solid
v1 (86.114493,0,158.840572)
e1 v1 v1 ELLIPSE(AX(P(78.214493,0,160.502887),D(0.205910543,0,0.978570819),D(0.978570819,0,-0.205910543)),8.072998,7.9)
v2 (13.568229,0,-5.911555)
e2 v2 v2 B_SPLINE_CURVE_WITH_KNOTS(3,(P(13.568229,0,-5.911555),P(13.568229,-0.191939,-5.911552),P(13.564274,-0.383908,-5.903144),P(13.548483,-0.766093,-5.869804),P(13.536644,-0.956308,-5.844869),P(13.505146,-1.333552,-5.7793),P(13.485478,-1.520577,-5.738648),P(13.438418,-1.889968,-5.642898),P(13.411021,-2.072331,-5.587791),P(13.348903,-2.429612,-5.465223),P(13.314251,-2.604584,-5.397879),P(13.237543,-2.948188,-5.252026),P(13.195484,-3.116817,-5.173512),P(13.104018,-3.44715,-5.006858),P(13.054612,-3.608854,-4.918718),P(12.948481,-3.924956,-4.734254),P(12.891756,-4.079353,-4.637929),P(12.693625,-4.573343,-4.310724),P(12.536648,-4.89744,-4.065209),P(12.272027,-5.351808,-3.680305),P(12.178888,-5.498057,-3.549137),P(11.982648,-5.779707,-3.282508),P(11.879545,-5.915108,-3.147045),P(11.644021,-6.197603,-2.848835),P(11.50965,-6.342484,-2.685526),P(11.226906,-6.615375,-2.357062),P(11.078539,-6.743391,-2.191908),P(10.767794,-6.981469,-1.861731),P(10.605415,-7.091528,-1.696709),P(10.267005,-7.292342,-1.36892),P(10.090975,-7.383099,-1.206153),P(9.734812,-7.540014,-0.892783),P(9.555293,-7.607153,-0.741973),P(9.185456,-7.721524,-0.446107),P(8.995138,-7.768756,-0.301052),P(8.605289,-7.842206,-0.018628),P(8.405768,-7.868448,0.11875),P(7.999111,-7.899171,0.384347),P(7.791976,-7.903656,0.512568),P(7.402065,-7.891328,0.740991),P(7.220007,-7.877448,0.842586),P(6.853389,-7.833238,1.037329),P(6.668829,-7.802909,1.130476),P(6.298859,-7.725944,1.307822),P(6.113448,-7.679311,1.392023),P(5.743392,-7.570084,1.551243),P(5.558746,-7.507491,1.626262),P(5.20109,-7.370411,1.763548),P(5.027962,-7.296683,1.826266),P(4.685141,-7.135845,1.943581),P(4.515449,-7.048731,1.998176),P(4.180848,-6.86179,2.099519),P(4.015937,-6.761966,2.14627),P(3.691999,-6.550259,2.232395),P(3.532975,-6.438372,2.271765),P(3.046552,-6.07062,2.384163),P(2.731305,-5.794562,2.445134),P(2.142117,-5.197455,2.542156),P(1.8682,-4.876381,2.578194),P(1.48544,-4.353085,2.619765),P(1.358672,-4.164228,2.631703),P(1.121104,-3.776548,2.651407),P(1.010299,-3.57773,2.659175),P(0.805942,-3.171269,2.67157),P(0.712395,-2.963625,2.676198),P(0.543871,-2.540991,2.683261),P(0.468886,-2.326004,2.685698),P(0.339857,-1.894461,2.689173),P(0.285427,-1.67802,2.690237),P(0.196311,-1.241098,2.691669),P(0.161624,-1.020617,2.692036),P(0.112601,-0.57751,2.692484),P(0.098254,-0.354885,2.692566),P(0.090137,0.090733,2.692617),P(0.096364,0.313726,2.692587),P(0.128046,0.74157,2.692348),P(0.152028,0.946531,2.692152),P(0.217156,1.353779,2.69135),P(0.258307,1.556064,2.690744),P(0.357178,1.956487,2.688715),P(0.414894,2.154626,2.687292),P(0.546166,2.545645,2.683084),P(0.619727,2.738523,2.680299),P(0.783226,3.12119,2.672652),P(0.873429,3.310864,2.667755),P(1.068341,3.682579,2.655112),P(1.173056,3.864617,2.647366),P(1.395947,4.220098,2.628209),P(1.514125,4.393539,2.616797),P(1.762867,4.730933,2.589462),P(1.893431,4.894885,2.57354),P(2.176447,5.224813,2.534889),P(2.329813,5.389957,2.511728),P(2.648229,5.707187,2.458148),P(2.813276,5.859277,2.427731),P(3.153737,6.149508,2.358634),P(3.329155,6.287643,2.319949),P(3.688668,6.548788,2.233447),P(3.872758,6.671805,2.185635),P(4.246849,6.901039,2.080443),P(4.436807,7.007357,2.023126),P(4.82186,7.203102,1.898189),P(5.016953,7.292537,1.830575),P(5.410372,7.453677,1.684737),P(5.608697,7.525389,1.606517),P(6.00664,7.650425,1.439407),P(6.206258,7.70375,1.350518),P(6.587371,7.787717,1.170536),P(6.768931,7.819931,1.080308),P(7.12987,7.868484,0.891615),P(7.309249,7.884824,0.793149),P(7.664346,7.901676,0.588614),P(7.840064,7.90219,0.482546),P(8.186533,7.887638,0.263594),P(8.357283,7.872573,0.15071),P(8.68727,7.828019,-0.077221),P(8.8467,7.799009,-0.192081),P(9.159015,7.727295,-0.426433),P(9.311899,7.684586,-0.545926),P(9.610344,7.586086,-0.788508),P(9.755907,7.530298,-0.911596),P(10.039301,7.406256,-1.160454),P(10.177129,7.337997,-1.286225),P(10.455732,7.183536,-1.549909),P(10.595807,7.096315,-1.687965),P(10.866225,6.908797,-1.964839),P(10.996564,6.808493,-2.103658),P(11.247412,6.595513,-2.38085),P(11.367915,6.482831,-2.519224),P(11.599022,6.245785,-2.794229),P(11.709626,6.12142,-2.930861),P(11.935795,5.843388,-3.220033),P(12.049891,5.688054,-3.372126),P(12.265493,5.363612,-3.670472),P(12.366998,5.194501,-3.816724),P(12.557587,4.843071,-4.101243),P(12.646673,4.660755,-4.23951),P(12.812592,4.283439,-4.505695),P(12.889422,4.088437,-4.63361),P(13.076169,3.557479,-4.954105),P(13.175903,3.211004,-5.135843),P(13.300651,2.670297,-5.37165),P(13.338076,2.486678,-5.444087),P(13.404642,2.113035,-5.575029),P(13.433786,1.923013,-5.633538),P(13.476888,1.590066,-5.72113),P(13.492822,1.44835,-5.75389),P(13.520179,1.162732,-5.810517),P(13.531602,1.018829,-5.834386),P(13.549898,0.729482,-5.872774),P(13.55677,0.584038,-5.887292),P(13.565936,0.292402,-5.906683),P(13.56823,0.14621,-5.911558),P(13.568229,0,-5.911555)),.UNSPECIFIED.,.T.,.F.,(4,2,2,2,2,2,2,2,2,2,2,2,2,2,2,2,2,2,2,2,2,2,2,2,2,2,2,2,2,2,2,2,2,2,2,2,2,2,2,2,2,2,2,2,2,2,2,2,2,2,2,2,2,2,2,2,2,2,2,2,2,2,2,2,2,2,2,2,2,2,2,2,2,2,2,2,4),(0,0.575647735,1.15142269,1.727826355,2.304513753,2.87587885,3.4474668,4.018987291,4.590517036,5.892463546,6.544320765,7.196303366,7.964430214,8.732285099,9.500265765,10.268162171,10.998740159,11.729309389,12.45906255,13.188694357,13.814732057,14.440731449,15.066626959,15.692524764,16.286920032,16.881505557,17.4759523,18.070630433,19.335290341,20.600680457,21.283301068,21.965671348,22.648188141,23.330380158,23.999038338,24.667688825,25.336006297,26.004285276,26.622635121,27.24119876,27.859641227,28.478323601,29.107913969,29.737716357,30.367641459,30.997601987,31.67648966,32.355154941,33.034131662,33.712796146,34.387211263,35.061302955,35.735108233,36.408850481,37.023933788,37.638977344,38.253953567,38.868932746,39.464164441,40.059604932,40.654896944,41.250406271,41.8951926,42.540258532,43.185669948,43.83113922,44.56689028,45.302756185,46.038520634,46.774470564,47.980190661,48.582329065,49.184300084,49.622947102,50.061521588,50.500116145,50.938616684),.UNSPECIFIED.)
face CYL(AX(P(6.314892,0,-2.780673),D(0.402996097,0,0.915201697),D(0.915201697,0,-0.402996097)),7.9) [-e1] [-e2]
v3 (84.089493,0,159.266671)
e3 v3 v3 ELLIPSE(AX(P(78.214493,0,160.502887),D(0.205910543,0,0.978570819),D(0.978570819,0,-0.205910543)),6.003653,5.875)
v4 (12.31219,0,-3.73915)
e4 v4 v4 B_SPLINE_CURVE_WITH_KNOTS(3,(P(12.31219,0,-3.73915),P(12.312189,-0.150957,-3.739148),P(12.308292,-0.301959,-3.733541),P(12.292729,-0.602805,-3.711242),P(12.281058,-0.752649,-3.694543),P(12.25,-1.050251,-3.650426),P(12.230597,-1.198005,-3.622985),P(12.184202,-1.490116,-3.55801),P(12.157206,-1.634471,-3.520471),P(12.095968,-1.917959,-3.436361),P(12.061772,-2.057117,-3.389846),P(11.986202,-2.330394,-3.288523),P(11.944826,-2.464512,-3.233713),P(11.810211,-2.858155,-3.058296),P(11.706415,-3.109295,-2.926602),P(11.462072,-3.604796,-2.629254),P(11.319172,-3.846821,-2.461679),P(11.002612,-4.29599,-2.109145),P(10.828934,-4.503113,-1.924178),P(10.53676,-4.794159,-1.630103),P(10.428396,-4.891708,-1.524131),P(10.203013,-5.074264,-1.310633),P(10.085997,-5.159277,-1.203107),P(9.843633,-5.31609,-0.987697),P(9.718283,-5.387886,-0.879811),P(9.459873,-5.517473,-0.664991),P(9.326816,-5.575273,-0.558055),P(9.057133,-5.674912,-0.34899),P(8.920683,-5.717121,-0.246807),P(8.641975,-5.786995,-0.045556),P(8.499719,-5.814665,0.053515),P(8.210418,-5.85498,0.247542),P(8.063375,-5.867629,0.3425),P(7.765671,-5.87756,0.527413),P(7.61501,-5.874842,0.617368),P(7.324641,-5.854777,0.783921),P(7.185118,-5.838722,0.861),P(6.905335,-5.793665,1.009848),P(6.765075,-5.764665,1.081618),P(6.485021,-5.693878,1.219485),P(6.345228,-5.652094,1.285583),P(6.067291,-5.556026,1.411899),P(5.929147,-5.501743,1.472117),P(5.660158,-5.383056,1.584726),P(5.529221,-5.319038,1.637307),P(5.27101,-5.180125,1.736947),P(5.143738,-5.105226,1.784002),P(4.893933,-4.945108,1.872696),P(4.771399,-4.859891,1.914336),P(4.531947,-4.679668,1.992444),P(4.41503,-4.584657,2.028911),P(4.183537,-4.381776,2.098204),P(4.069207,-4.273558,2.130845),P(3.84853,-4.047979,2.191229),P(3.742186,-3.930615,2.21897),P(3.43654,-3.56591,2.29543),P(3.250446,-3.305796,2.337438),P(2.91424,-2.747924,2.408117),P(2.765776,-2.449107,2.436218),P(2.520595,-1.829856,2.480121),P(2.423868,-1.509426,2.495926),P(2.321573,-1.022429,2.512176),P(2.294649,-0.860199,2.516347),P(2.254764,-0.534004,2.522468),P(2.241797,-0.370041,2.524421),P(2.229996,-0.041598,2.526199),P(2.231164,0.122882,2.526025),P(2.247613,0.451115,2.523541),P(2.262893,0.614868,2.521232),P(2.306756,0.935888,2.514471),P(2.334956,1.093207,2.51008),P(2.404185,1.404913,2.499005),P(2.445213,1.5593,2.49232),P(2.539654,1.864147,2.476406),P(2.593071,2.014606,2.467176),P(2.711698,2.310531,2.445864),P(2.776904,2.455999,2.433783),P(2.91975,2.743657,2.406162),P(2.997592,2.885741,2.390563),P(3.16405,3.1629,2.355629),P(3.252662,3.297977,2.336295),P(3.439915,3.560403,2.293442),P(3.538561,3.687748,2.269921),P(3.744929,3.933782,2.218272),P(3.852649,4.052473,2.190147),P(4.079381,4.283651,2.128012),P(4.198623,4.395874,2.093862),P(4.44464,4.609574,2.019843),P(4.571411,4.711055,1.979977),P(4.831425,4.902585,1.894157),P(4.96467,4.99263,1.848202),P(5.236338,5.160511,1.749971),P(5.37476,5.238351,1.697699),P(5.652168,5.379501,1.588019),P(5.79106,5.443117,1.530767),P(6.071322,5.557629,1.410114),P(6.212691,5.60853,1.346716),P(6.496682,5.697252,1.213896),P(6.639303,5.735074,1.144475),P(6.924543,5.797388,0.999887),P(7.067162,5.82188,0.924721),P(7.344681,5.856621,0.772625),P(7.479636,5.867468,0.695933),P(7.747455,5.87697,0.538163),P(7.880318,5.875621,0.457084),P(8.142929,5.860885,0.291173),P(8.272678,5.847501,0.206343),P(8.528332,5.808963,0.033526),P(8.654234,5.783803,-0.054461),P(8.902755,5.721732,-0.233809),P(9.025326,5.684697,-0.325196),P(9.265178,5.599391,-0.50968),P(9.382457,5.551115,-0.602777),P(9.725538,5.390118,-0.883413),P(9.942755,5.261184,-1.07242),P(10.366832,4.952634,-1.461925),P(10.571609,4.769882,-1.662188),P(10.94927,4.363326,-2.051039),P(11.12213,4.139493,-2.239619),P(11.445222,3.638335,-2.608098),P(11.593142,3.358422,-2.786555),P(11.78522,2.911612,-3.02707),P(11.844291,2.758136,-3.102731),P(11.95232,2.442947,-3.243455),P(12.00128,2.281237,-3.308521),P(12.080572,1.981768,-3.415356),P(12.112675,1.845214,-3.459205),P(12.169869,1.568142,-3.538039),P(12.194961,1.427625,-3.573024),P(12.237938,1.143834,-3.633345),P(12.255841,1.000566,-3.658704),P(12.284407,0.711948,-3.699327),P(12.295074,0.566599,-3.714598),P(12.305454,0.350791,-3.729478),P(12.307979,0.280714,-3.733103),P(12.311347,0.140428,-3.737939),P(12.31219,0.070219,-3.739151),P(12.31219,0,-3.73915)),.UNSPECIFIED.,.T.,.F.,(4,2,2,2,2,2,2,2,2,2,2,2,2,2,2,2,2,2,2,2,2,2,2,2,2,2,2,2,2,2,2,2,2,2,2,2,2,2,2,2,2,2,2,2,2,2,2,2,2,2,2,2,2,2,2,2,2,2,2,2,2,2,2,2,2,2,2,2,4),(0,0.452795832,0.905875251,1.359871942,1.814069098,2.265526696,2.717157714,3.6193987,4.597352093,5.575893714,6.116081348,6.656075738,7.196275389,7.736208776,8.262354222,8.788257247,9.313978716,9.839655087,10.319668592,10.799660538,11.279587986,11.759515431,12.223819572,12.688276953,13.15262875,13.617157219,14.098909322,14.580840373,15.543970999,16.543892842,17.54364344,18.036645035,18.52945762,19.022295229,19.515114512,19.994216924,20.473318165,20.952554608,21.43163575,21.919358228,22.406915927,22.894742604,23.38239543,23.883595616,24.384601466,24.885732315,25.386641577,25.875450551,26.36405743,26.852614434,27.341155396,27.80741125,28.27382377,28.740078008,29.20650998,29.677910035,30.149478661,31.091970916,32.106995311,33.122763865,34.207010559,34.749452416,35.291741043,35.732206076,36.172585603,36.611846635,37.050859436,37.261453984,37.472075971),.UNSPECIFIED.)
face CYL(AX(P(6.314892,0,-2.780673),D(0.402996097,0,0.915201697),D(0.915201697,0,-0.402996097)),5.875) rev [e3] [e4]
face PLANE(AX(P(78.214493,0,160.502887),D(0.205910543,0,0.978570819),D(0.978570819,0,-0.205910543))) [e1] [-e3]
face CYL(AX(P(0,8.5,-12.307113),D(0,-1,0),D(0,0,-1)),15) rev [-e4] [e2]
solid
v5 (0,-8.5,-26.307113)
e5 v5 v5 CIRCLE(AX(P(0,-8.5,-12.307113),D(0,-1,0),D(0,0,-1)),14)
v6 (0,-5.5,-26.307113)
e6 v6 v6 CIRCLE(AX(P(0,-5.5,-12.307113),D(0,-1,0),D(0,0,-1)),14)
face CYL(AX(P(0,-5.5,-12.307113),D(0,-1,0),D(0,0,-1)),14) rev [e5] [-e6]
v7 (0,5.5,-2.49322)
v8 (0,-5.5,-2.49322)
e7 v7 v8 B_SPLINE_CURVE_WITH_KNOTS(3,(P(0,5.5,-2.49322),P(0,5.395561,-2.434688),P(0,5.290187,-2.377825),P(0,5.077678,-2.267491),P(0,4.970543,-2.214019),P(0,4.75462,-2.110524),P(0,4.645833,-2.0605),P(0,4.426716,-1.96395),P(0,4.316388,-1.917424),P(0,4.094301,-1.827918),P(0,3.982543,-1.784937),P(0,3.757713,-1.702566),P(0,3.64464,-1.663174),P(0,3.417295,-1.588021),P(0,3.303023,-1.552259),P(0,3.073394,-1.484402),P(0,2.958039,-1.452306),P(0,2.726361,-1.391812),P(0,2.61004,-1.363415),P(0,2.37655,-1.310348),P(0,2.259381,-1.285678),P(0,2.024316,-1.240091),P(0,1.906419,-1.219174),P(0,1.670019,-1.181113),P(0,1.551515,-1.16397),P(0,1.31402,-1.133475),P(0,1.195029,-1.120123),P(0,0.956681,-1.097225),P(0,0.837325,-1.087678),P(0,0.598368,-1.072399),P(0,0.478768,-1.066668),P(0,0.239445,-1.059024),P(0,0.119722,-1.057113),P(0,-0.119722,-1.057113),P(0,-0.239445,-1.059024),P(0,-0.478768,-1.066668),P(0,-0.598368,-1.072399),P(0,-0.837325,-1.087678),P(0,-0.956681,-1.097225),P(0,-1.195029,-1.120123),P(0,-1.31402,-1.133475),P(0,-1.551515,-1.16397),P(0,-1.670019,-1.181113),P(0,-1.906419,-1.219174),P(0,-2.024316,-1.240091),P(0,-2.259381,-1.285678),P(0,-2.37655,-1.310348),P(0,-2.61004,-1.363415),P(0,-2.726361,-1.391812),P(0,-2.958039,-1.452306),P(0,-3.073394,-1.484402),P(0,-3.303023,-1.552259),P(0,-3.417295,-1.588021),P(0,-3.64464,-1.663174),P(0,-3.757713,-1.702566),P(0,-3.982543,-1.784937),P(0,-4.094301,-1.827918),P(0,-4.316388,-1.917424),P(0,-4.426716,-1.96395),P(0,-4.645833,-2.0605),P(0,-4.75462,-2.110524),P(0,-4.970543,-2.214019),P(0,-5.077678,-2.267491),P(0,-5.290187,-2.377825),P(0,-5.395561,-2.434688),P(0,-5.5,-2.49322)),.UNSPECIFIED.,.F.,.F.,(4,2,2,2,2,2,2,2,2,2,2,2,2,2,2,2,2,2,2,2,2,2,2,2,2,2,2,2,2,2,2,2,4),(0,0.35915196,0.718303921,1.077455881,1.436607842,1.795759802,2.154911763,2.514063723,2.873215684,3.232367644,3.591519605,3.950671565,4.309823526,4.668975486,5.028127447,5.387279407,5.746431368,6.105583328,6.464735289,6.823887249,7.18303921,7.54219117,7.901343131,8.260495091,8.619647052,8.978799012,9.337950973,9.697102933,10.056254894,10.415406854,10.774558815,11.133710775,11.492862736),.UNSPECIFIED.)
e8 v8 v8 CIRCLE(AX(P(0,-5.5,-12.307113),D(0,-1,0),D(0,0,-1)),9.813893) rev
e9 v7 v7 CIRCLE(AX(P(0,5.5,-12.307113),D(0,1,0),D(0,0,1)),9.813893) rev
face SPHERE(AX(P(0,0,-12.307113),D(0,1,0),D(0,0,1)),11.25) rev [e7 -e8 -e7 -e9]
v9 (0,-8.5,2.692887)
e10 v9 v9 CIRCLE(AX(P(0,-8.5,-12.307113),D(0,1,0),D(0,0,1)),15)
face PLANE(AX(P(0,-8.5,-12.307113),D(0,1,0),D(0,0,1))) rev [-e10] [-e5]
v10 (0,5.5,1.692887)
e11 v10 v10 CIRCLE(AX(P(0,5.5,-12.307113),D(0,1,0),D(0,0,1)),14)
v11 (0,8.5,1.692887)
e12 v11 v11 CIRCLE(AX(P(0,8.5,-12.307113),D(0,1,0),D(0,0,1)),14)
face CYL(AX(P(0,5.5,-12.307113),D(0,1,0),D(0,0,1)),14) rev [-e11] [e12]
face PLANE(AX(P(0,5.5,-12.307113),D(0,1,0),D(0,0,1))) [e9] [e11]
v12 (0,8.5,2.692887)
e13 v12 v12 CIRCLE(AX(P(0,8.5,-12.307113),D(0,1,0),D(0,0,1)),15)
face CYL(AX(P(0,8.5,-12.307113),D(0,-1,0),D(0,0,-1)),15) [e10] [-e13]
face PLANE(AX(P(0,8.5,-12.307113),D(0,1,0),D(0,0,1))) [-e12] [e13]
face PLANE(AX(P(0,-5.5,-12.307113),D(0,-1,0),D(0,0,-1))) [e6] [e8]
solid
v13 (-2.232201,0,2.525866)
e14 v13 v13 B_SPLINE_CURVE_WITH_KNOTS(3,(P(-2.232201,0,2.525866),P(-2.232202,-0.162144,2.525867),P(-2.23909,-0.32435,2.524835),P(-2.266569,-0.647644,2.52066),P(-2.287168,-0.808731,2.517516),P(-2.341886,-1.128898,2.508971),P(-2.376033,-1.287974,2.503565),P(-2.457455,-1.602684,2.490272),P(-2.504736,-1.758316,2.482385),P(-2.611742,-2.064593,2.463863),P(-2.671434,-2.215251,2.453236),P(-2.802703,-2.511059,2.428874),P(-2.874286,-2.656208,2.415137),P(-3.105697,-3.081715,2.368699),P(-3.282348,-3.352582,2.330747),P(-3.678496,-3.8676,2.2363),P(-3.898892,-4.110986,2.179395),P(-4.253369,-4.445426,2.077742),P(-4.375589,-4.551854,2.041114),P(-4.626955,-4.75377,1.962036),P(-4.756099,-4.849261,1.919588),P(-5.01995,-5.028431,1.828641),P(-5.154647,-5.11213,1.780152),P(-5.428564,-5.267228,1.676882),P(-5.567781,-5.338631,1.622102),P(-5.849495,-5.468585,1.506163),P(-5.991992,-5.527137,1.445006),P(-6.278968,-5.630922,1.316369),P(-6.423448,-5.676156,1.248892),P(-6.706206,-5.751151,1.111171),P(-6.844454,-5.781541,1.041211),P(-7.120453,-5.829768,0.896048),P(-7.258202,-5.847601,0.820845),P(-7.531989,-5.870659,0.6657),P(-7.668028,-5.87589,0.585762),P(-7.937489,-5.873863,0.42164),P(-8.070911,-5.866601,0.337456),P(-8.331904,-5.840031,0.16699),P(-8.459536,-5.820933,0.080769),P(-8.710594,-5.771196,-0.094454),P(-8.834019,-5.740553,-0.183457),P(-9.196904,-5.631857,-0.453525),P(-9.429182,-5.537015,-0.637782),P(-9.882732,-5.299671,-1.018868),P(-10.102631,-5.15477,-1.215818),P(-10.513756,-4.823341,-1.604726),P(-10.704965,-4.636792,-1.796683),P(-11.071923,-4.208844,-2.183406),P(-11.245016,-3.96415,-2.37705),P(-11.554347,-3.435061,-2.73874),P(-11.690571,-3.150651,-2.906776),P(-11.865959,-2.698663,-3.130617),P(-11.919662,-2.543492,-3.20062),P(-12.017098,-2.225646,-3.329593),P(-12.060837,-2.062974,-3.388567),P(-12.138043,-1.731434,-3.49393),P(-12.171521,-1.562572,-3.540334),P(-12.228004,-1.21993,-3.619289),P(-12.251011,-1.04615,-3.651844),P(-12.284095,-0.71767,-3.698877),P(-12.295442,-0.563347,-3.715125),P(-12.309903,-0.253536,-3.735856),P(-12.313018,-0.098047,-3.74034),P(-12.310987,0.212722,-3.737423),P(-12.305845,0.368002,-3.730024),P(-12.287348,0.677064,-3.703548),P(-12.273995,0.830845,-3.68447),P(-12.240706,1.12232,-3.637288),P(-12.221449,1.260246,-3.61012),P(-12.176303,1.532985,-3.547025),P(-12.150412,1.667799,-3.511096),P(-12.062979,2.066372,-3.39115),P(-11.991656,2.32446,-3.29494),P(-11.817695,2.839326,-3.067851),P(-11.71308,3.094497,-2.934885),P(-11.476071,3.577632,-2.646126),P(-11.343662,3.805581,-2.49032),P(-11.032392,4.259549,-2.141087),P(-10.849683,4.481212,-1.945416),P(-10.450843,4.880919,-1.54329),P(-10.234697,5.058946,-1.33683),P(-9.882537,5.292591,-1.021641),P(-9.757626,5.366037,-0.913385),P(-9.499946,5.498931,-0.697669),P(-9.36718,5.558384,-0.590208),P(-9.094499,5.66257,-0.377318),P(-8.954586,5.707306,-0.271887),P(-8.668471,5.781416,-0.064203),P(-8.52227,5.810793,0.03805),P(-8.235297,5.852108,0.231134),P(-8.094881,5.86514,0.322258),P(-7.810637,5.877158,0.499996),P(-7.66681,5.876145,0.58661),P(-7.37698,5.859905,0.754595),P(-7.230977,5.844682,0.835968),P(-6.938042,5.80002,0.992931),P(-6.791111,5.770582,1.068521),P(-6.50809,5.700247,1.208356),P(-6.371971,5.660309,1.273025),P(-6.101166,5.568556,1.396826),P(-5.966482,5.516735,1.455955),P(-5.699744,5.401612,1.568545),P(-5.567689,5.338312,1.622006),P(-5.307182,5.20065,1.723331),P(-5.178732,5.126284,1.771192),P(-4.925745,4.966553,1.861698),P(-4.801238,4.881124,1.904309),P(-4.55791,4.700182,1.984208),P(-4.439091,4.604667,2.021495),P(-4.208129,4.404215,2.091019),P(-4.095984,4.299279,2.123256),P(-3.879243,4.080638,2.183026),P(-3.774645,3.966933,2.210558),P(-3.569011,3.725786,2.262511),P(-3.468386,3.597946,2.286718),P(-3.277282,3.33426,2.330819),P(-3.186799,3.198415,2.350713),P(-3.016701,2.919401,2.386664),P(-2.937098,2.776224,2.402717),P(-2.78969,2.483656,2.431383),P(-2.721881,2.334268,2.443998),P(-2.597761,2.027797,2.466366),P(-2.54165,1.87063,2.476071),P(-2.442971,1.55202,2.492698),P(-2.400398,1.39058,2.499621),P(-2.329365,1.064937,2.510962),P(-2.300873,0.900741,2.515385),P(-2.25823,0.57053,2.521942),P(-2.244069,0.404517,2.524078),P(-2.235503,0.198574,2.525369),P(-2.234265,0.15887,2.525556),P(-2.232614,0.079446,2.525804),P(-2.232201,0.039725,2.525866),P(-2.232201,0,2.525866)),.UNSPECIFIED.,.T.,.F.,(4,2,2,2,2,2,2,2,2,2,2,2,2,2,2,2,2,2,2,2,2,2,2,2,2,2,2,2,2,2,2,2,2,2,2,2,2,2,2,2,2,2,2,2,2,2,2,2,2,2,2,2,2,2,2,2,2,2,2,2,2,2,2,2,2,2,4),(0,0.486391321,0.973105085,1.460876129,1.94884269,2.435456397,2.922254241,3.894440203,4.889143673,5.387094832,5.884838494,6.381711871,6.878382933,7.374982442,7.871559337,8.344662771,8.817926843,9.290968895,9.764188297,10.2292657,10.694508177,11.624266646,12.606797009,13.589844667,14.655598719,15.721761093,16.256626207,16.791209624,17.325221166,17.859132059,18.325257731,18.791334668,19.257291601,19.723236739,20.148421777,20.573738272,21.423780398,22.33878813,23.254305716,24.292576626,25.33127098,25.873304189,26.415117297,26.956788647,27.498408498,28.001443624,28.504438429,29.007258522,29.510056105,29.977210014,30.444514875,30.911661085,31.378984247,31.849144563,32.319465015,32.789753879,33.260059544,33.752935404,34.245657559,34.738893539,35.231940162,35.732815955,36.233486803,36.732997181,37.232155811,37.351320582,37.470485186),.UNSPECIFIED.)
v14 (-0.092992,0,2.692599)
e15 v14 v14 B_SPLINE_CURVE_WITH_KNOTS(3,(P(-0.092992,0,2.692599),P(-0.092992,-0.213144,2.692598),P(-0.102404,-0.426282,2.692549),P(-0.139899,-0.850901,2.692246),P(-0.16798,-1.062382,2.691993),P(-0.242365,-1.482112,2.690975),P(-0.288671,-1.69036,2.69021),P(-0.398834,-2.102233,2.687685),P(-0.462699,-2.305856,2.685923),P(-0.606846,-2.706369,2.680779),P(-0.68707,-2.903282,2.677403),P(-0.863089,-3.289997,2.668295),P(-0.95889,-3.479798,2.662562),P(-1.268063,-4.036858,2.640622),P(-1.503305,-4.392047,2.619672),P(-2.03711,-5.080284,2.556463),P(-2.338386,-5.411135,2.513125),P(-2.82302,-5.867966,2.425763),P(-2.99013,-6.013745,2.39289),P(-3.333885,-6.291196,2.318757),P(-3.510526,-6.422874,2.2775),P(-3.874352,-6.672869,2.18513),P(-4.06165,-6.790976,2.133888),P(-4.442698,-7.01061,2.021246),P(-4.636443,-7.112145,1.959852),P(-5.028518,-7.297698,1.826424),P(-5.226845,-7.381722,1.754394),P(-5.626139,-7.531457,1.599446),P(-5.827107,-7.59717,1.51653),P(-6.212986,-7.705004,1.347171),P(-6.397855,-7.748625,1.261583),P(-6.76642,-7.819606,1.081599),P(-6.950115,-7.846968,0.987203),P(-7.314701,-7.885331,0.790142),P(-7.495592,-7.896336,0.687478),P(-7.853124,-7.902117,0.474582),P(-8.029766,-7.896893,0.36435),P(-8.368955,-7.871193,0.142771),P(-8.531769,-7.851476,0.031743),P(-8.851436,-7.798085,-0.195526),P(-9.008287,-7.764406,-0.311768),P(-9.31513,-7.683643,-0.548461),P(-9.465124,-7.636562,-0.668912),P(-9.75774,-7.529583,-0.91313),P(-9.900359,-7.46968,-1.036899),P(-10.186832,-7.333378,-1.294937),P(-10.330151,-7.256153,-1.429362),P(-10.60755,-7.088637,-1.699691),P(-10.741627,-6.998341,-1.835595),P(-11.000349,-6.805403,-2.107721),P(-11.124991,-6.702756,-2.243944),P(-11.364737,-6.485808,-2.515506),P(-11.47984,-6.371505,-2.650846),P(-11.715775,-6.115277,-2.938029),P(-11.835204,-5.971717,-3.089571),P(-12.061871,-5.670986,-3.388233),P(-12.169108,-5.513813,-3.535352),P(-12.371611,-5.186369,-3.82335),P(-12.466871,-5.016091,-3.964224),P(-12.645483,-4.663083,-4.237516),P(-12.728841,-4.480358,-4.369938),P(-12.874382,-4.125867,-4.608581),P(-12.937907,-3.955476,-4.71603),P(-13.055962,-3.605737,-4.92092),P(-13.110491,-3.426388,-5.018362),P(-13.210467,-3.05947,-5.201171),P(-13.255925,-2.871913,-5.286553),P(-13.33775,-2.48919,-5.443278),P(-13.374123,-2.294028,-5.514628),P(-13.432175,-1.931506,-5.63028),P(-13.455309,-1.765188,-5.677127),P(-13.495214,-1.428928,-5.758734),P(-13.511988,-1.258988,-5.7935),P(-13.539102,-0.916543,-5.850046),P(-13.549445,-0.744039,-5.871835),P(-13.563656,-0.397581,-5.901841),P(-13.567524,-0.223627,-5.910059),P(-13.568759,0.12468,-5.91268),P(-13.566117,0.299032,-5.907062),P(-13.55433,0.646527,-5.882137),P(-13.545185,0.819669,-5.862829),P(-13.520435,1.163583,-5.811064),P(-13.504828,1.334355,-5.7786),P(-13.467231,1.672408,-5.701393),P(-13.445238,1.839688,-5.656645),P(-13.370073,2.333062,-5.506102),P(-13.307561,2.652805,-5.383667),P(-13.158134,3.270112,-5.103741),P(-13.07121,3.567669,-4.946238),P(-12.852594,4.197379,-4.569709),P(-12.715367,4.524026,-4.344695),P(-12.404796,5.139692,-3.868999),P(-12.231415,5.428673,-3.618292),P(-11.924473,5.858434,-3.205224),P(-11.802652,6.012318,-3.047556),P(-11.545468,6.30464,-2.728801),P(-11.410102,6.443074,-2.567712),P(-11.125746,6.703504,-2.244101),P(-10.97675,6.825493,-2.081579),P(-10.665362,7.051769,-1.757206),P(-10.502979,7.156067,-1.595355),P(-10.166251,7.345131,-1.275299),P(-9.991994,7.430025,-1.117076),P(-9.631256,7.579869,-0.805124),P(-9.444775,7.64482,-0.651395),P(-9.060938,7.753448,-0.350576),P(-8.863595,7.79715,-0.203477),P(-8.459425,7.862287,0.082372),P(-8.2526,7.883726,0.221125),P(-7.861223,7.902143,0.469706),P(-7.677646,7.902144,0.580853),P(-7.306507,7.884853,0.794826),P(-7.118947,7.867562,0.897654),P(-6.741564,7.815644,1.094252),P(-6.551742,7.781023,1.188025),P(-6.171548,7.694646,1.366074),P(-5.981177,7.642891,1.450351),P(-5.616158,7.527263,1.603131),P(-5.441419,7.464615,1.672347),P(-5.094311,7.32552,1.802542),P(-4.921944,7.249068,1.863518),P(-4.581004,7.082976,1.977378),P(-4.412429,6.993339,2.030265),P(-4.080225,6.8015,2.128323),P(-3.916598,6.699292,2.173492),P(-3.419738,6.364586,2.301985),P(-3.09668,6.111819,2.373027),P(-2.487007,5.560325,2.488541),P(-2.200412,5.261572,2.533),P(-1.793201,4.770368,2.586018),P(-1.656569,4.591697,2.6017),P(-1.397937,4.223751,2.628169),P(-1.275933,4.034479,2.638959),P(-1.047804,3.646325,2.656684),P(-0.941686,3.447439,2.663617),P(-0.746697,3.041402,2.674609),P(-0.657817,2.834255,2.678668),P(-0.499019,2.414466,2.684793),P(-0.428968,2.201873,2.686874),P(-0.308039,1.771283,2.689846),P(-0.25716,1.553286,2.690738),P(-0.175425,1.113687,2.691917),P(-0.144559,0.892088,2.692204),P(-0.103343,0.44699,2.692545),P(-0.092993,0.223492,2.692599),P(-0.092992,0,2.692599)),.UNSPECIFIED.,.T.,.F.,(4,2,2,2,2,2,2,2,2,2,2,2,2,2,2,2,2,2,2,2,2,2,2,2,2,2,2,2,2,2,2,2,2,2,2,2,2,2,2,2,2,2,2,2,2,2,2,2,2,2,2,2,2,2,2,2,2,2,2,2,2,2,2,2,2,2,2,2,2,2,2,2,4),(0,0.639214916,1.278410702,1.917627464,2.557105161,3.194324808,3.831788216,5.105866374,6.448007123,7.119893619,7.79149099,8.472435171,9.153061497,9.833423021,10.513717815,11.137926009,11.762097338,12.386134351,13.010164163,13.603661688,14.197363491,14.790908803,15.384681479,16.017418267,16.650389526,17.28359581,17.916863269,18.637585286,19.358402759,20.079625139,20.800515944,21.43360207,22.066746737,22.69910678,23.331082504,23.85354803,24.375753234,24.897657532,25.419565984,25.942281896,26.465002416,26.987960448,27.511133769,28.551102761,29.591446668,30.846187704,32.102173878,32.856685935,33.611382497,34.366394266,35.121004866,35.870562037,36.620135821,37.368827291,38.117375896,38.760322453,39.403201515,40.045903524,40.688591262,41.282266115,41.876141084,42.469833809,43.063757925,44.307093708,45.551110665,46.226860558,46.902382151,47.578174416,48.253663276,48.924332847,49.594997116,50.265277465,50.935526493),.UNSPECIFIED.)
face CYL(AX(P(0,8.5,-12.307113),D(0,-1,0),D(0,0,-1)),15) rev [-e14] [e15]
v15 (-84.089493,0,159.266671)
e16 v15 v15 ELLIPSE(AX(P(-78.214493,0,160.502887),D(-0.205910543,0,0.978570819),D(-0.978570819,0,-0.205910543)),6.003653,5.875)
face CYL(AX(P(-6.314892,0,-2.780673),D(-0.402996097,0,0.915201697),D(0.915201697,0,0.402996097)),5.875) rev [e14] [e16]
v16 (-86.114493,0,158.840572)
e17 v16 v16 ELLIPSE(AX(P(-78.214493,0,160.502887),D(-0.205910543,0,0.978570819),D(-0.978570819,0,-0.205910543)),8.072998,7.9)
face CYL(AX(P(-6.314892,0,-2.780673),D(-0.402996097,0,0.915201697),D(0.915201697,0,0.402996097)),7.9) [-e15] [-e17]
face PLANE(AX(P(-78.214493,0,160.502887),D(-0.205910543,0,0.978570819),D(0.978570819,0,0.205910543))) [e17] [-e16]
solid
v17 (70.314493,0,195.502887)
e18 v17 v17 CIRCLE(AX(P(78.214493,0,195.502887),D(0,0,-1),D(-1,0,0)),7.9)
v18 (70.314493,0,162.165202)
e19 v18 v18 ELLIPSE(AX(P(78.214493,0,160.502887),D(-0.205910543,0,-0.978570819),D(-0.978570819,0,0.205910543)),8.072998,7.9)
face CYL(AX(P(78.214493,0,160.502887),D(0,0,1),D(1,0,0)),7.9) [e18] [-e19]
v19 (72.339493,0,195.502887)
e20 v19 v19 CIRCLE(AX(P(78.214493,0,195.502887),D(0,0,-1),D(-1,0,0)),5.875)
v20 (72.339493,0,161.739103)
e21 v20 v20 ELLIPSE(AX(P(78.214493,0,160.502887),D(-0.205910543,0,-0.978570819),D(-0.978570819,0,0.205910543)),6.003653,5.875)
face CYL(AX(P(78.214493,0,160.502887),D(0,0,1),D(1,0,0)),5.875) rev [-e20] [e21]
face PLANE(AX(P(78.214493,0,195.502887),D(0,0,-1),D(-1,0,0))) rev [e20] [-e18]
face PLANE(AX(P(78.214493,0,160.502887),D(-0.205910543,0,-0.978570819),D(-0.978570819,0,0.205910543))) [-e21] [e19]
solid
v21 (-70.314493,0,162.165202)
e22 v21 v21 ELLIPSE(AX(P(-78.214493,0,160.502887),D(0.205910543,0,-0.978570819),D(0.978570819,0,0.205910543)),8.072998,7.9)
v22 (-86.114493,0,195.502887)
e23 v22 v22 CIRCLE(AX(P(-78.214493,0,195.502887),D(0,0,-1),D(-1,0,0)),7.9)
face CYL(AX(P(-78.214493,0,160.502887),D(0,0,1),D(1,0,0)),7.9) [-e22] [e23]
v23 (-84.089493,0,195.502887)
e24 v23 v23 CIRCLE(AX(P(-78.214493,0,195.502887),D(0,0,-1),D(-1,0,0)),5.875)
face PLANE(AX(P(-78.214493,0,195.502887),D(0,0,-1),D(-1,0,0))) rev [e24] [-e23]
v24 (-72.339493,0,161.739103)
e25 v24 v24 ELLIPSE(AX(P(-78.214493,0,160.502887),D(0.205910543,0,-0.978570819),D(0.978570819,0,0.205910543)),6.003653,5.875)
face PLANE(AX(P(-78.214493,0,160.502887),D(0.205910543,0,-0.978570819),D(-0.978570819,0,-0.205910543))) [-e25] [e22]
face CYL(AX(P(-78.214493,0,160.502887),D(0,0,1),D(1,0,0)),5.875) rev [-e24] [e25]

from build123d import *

# Parameters (mm, degrees)
SKETCH1_ON_SEGMENT_1_R                  = 7.9
SKETCH1_ON_SEGMENT_1_R_2                = 5.875
CIRCULAR_TUBE_21_3_X_2_3_1_DEPTH        = 38.350868903
CIRCULAR_TUBE_21_3_X_2_3_1_2_DEPTH      = 178.412650039
CIRCULAR_TUBE_21_3_X_2_3_1_2_DEPTH_BACK = 3.350868903
SKETCH1_R                               = 7.9
SKETCH1_R_2                             = 5.875
SKETCH11_ON_SEGMENT_1_R                 = 7.9
SKETCH11_ON_SEGMENT_1_R_2               = 5.875
CIRCULAR_TUBE_21_3_X_2_3_2_DEPTH        = 38.350868903
CIRCULAR_TUBE_21_3_X_2_3_2_2_DEPTH      = 178.412650039
CIRCULAR_TUBE_21_3_X_2_3_2_2_DEPTH_BACK = 3.350868903
SKETCH11_R                              = 7.9
SKETCH11_R_2                            = 5.875
SKETCH_1_R                              = 15
EXTRUDE_1_DEPTH                         = 8.5
SKETCH_5_R                              = 14
CUT_EXTRUDE_1_DEPTH                     = 3
SKETCH_7_R                              = 14
CUT_EXTRUDE_2_DEPTH                     = 3
WELD_START                              = -9
WELD_TRIM_4_DEPTH                       = 18
WELD_TRIM_4_2_DEPTH                     = 18


with BuildPart() as part:
    # Sketch1 on segment 1 (carried to segment 1) → Circular tube 21.3 X 2.3(1) (new body)
    with BuildSketch(Plane(origin=(-78.21449332, 0, 195.502886979), x_dir=(-1, 0, 0), z_dir=(0, 0, -1))):
        Circle(SKETCH1_ON_SEGMENT_1_R)
        Circle(SKETCH1_ON_SEGMENT_1_R_2, mode=Mode.SUBTRACT)
    extrude(amount=CIRCULAR_TUBE_21_3_X_2_3_1_DEPTH)

    # Circular tube 21.3 X 2.3(1) mitre 1
    split(bisect_by=Plane(origin=(-78.21449332, 0, 160.502886979), x_dir=(0, -1, 0), z_dir=(-0.205910543, 0, 0.978570819)), keep=Keep.TOP)


with BuildPart() as body_2:
    # Sketch1 → Circular tube 21.3 X 2.3_1 2 (new, two sides: drawn at the far end of the back side and taken through both)
    with BuildSketch(Plane(origin=(-78.21449332, 0, 160.502886979), x_dir=(-0.9152016968098962, 0, -0.4029960969491974), z_dir=(0.4029960969491974, 0, -0.9152016968098962)).offset(-CIRCULAR_TUBE_21_3_X_2_3_1_2_DEPTH_BACK)):
        Circle(SKETCH1_R)
        Circle(SKETCH1_R_2, mode=Mode.SUBTRACT)
    extrude(amount=CIRCULAR_TUBE_21_3_X_2_3_1_2_DEPTH + CIRCULAR_TUBE_21_3_X_2_3_1_2_DEPTH_BACK)

    # Circular tube 21.3 X 2.3_1 2 mitre 1
    split(bisect_by=Plane(origin=(-78.21449332, 0, 160.502886979), x_dir=(0, 1, 0), z_dir=(0.205910543, 0, -0.978570819)), keep=Keep.TOP)


with BuildPart() as body_3:
    # Sketch11 on segment 1 (carried to segment 1) → Circular tube 21.3 X 2.3(2) (new body)
    with BuildSketch(Plane(origin=(78.21449332, 0, 195.502886979), x_dir=(-1, 0, 0), z_dir=(0, 0, -1))):
        Circle(SKETCH11_ON_SEGMENT_1_R)
        Circle(SKETCH11_ON_SEGMENT_1_R_2, mode=Mode.SUBTRACT)
    extrude(amount=CIRCULAR_TUBE_21_3_X_2_3_2_DEPTH)

    # Circular tube 21.3 X 2.3(2) mitre 1
    split(bisect_by=Plane(origin=(78.21449332, 0, 160.502886979), x_dir=(0, -1, 0), z_dir=(0.205910543, 0, 0.978570819)), keep=Keep.TOP)


with BuildPart() as body_4:
    # Sketch11 → Circular tube 21.3 X 2.3_2 2 (new, two sides: drawn at the far end of the back side and taken through both)
    with BuildSketch(Plane(origin=(78.21449332, 0, 160.502886979), x_dir=(-0.9152016968098962, 0, 0.40299609694919775), z_dir=(-0.40299609694919775, 0, -0.9152016968098962)).offset(-CIRCULAR_TUBE_21_3_X_2_3_2_2_DEPTH_BACK)):
        Circle(SKETCH11_R)
        Circle(SKETCH11_R_2, mode=Mode.SUBTRACT)
    extrude(amount=CIRCULAR_TUBE_21_3_X_2_3_2_2_DEPTH + CIRCULAR_TUBE_21_3_X_2_3_2_2_DEPTH_BACK)

    # Circular tube 21.3 X 2.3_2 2 mitre 1
    split(bisect_by=Plane(origin=(78.21449332, 0, 160.502886979), x_dir=(0, 1, 0), z_dir=(-0.205910543, 0, -0.978570819)), keep=Keep.TOP)


with BuildPart() as body_5:
    # 스케치1 → 보스-돌출1 (new, symmetric)
    with BuildSketch(Plane(origin=(0, 0, 0), x_dir=(1, 0, 0), z_dir=(0, 1, 0))):
        with Locations(Location((0, 12.307113021, 0), (0, 0, 270))):
            Circle(SKETCH_1_R)
    extrude(amount=EXTRUDE_1_DEPTH, both=True)


with BuildPart() as cut_extrude_1_tool:
    # 스케치5 → 컷-돌출1 (new body)
    with BuildSketch(Plane(origin=(0, 8.5, 0), x_dir=(1, 0, 0), z_dir=(0, 1, 0))):
        with Locations(Location((0, 12.307113021, 0), (0, 0, 270))):
            Circle(SKETCH_5_R)
    extrude(amount=-CUT_EXTRUDE_1_DEPTH)


with BuildPart() as body_2_1:
    add(body_2.part)

    # 컷-돌출1: cut by cut_extrude_1_tool
    add(cut_extrude_1_tool.part, mode=Mode.SUBTRACT)


with BuildPart() as body_4_1:
    add(body_4.part)

    # 컷-돌출1: cut by cut_extrude_1_tool
    add(cut_extrude_1_tool.part, mode=Mode.SUBTRACT)


with BuildPart() as body_5_1:
    add(body_5.part)

    # 컷-돌출1: cut by cut_extrude_1_tool
    add(cut_extrude_1_tool.part, mode=Mode.SUBTRACT)


with BuildPart() as cut_extrude_2_tool:
    # 스케치7 → 컷-돌출2 (new body)
    with BuildSketch(Plane.XZ.offset(8.5)):
        with Locations(Location((0, -12.307113021, 0), (0, 0, 90))):
            Circle(SKETCH_7_R)
    extrude(amount=-CUT_EXTRUDE_2_DEPTH)


with BuildPart() as body_2_2:
    add(body_2_1.part)

    # 컷-돌출2: cut by cut_extrude_2_tool
    add(cut_extrude_2_tool.part, mode=Mode.SUBTRACT)

    # Weld Trim 4 2 outline → Weld Trim 4 2 (cut)
    with BuildSketch(Plane(origin=(0, 0, 0), x_dir=(1, 0, 0), z_dir=(0, 1, 0)).offset(WELD_START)):
        with BuildLine():
            ThreePointArc((-13.56855558, 5.912247934), (-8.072813552, -0.335263392), (-0.092992229, -2.692598725))
            Line((-0.092992229, -2.692598725), (2, -2.705574442))
            Line((2, -2.705574442), (2, -0.880671656))
            Line((2, -0.880671656), (0.915201697, -0.402996097))
            Line((0.915201697, -0.402996097), (-4.424689992, 1.948349531))
            Line((-4.424689992, 1.948349531), (-8.205093424, 3.612996606))
            Line((-8.205093424, 3.612996606), (-13.544985113, 5.964342235))
            Line((-13.544985113, 5.964342235), (-13.60570988, 5.991081524))
            Line((-13.60570988, 5.991081524), (-13.56855558, 5.912247934))
        make_face()
    extrude(amount=WELD_TRIM_4_2_DEPTH, mode=Mode.SUBTRACT)


with BuildPart() as body_4_2:
    add(body_4_1.part)

    # 컷-돌출2: cut by cut_extrude_2_tool
    add(cut_extrude_2_tool.part, mode=Mode.SUBTRACT)

    # Weld Trim 4: read off the stored shape, not the designer's step
    # Weld Trim 4 outline → Weld Trim 4 (cut)
    with BuildSketch(Plane(origin=(0, 0, 0), x_dir=(1, 0, 0), z_dir=(0, 1, 0)).offset(WELD_START)):
        with BuildLine():
            ThreePointArc((0.092364574, -2.692602603), (8.072226744, -0.33563808), (13.568229514, 5.911556137))
            Line((13.568229514, 5.911556137), (13.605716105, 5.991084266))
            Line((13.605716105, 5.991084266), (13.544985113, 5.964342235))
            Line((13.544985113, 5.964342235), (8.205093424, 3.612996607))
            Line((8.205093424, 3.612996607), (4.424689992, 1.948349532))
            Line((4.424689992, 1.948349532), (-0.915201697, -0.402996097))
            Line((-0.915201697, -0.402996097), (-2, -0.880671655))
            Line((-2, -0.880671655), (-2, -2.705486871))
            Line((-2, -2.705486871), (0.092364574, -2.692602603))
        make_face()
    extrude(amount=WELD_TRIM_4_DEPTH, mode=Mode.SUBTRACT)


with BuildPart() as body_5_2:
    add(body_5_1.part)

    # 컷-돌출2: cut by cut_extrude_2_tool
    add(cut_extrude_2_tool.part, mode=Mode.SUBTRACT)

    # 스케치9 → 컷-회전1 (revolve, cut)
    with BuildSketch(Plane(origin=(0, 0, 0), x_dir=(0, 0, -1), z_dir=(1, 0, 0))):
        with BuildLine():
            Line((12.307113021, -11.25), (12.307113021, 11.25))
            ThreePointArc((12.307113021, 11.25), (23.557113021, 0), (12.307113021, -11.25))
        make_face()
    revolve(axis=Axis((0, 8.5, -12.307113021), (0, -1, 0)), mode=Mode.SUBTRACT)


solid = Compound([part.part, body_3.part, body_2_2.part, body_4_2.part, body_5_2.part])
